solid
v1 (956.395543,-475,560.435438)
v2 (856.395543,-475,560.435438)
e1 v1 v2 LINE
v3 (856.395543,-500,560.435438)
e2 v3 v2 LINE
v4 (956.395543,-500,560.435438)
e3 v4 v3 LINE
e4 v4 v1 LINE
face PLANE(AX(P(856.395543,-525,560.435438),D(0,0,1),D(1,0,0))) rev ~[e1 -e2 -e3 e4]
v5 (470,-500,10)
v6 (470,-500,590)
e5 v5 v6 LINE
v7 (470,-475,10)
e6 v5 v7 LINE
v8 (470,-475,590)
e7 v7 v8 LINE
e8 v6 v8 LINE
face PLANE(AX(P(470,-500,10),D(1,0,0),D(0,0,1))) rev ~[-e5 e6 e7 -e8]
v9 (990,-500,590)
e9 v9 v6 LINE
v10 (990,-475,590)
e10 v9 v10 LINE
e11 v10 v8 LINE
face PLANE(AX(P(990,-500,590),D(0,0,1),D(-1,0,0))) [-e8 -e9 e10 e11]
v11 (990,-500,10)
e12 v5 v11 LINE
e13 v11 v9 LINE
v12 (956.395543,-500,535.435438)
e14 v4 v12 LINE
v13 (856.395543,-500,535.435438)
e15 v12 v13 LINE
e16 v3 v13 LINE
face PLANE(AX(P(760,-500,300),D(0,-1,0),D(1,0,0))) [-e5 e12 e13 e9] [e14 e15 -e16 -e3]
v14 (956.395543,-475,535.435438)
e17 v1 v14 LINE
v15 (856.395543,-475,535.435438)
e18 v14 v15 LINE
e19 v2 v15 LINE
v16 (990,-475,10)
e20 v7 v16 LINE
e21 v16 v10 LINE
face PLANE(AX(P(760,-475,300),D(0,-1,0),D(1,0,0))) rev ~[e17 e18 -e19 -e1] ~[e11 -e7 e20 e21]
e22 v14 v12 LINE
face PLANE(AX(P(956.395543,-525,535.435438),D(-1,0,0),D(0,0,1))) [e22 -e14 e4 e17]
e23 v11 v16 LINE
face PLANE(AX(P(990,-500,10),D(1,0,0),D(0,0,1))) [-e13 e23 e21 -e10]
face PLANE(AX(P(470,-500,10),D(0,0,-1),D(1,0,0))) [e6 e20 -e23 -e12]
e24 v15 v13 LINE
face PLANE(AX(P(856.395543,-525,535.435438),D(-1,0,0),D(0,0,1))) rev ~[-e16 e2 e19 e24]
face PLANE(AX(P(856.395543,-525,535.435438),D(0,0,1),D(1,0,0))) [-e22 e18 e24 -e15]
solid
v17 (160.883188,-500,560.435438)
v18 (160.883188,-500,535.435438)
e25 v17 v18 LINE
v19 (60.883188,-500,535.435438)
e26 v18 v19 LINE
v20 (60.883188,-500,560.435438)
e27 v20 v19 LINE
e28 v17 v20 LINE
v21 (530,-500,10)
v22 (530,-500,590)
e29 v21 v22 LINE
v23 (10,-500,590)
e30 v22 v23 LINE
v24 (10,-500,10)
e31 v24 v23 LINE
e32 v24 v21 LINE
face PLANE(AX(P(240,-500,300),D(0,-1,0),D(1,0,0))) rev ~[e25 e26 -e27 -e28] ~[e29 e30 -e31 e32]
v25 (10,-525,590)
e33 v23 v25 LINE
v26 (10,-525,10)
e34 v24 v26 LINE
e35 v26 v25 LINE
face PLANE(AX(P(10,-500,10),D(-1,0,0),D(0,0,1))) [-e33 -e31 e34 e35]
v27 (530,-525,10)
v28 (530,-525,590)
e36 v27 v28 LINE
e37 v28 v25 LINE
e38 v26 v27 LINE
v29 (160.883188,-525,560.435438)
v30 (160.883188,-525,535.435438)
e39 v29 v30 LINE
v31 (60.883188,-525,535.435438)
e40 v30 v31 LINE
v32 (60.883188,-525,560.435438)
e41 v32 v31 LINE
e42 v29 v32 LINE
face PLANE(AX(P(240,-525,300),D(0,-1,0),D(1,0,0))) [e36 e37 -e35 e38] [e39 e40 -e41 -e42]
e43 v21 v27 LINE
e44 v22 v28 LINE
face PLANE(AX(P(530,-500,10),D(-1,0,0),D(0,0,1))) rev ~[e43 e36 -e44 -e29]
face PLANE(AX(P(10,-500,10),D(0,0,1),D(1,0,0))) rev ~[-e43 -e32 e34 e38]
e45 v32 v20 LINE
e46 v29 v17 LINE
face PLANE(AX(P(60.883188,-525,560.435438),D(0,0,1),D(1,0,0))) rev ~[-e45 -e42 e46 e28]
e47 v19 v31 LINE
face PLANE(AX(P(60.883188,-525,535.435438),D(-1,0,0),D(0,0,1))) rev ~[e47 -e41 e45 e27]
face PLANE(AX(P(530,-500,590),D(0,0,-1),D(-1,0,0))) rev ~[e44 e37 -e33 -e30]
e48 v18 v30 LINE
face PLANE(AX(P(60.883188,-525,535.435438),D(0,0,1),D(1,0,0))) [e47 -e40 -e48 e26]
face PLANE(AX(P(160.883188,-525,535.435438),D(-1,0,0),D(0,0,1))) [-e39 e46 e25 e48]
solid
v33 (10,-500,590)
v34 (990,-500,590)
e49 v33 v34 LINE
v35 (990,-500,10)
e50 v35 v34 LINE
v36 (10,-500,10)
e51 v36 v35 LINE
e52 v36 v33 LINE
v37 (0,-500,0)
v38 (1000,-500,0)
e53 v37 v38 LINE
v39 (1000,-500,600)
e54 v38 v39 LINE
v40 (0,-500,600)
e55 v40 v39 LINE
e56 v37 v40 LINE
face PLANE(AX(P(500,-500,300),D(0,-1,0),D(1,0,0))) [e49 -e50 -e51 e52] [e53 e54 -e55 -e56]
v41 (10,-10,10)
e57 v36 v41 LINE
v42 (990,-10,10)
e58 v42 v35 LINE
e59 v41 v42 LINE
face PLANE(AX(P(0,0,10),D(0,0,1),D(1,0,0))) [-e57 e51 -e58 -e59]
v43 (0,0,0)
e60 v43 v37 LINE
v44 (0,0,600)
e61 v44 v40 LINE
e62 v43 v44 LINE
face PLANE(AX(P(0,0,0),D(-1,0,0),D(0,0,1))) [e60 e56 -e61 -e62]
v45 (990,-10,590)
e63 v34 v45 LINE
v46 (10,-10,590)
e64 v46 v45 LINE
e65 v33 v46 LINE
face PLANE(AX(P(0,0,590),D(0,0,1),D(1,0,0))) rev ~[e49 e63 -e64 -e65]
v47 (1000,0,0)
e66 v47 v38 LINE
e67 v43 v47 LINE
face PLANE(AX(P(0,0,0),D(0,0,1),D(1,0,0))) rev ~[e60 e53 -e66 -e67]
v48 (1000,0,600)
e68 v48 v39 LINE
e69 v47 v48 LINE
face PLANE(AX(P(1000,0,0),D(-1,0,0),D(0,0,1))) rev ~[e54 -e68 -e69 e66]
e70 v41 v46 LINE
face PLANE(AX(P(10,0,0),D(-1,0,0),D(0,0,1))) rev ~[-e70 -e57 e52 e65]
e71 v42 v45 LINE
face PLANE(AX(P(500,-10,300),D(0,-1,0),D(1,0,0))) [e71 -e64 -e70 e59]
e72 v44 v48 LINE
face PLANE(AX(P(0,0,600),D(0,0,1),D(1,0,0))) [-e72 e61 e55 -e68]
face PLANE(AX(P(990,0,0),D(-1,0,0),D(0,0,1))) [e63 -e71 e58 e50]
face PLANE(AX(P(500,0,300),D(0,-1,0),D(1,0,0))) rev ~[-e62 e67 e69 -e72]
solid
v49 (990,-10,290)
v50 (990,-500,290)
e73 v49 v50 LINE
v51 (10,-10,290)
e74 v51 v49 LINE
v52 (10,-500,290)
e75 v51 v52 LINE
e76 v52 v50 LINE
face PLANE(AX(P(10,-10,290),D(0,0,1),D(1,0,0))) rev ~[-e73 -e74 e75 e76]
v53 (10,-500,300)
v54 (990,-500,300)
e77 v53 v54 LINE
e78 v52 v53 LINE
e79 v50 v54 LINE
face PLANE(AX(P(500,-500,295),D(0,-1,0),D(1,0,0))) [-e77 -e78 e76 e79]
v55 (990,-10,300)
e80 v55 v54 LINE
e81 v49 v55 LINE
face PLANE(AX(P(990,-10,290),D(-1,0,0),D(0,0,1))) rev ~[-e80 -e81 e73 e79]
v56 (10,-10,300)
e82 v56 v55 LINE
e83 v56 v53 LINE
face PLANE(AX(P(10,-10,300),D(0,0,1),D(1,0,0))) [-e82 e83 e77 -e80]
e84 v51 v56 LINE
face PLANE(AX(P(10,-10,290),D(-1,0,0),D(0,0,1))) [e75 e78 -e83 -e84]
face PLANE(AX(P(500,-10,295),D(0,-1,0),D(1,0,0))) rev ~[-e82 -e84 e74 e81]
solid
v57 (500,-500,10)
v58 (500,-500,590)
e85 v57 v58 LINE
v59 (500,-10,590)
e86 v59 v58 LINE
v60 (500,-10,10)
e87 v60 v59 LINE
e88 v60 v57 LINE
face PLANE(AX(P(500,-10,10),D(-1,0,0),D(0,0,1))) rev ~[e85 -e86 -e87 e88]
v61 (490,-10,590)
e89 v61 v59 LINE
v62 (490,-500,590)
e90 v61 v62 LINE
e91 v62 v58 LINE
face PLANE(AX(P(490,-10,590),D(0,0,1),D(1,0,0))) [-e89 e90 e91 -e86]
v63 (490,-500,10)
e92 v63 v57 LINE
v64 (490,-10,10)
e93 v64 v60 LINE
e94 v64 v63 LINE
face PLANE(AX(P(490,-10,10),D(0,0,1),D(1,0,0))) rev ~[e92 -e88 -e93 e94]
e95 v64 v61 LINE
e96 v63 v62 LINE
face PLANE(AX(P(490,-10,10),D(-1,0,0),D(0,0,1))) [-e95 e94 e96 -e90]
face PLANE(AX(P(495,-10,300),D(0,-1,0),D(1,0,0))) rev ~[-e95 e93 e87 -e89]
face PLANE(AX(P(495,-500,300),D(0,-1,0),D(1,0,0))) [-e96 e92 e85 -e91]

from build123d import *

# Parameters (mm, degrees)
F0_W          = 1000
F0_H          = 600
F1_DEPTH      = 500
F2_T          = -10
F3_W          = 460
F3_H          = 580
F3_W_2        = 60
F4_DEPTH      = 25
F5_DEPTH      = 25
F6_W          = 100
F6_H          = 25
F7_DEPTH      = 525.001
F7_DEPTH_BACK = 1899
F8_W          = 980
F8_H          = 10
F9_DEPTH      = 490
F10_W         = 10
F10_H         = 580
F11_DEPTH     = 490


# Not quite as in the source:
# - an extrude ends at something that could not be found from the text; its depth is read off the source's solid


with BuildPart() as f1:
    # F0 (on Front) → F1 (new body)
    with BuildSketch(Plane.XZ):
        with Locations((500, 300)):
            Rectangle(F0_W, F0_H)
    extrude(amount=F1_DEPTH)

    # F2
    f2_openings = [f1.faces().sort_by_distance(p)[0] for p in [
        (500, -500, 300),
    ]]
    offset(amount=F2_T, openings=f2_openings)


with BuildPart() as f4:
    # F3 (on face) → F4 (new body)
    with BuildSketch(Plane.XZ.offset(500)):
        with Locations((240, 300)):
            Rectangle(F3_W, F3_H)
        with Locations((500, 300)):
            Rectangle(F3_W_2, F3_H)
    extrude(amount=F4_DEPTH)


with BuildPart() as f5:
    # F3 (on face) → F5 (new body)
    with BuildSketch(Plane.XZ.offset(500)):
        with Locations((760, 300)):
            Rectangle(F3_W, F3_H)
        with Locations((500, 300)):
            Rectangle(F3_W_2, F3_H)
    extrude(amount=-F5_DEPTH)


with BuildPart() as f7_tool:
    # F6 (on face) → F7 (new body, two sides)
    with BuildSketch(Plane.XZ.offset(525)) as f7_sk:
        with Locations((110.8831882477, 547.9354381561)):
            Rectangle(F6_W, F6_H)
        with Locations((906.3955426216, 547.9354381561)):
            Rectangle(F6_W, F6_H)
    extrude(amount=-F7_DEPTH)
    extrude(f7_sk.sketch, amount=F7_DEPTH_BACK)


with BuildPart() as f4_1:
    add(f4.part)

    # F7: cut by f7_tool
    add(f7_tool.part, mode=Mode.SUBTRACT)


with BuildPart() as f5_1:
    add(f5.part)

    # F7: cut by f7_tool
    add(f7_tool.part, mode=Mode.SUBTRACT)


with BuildPart() as f9:
    # F8 (on face) → F9 (new body, through all)
    with BuildSketch(Plane.XZ.offset(10)):
        with Locations((500, 295)):
            Rectangle(F8_W, F8_H)
    extrude(amount=F9_DEPTH)


with BuildPart() as f11:
    # F10 (on face) → F11 (new body, through all)
    with BuildSketch(Plane.XZ.offset(10)):
        with Locations((495, 300)):
            Rectangle(F10_W, F10_H)
    extrude(amount=F11_DEPTH)


solid = Compound([f1.part, f4_1.part, f5_1.part, f9.part, f11.part])
